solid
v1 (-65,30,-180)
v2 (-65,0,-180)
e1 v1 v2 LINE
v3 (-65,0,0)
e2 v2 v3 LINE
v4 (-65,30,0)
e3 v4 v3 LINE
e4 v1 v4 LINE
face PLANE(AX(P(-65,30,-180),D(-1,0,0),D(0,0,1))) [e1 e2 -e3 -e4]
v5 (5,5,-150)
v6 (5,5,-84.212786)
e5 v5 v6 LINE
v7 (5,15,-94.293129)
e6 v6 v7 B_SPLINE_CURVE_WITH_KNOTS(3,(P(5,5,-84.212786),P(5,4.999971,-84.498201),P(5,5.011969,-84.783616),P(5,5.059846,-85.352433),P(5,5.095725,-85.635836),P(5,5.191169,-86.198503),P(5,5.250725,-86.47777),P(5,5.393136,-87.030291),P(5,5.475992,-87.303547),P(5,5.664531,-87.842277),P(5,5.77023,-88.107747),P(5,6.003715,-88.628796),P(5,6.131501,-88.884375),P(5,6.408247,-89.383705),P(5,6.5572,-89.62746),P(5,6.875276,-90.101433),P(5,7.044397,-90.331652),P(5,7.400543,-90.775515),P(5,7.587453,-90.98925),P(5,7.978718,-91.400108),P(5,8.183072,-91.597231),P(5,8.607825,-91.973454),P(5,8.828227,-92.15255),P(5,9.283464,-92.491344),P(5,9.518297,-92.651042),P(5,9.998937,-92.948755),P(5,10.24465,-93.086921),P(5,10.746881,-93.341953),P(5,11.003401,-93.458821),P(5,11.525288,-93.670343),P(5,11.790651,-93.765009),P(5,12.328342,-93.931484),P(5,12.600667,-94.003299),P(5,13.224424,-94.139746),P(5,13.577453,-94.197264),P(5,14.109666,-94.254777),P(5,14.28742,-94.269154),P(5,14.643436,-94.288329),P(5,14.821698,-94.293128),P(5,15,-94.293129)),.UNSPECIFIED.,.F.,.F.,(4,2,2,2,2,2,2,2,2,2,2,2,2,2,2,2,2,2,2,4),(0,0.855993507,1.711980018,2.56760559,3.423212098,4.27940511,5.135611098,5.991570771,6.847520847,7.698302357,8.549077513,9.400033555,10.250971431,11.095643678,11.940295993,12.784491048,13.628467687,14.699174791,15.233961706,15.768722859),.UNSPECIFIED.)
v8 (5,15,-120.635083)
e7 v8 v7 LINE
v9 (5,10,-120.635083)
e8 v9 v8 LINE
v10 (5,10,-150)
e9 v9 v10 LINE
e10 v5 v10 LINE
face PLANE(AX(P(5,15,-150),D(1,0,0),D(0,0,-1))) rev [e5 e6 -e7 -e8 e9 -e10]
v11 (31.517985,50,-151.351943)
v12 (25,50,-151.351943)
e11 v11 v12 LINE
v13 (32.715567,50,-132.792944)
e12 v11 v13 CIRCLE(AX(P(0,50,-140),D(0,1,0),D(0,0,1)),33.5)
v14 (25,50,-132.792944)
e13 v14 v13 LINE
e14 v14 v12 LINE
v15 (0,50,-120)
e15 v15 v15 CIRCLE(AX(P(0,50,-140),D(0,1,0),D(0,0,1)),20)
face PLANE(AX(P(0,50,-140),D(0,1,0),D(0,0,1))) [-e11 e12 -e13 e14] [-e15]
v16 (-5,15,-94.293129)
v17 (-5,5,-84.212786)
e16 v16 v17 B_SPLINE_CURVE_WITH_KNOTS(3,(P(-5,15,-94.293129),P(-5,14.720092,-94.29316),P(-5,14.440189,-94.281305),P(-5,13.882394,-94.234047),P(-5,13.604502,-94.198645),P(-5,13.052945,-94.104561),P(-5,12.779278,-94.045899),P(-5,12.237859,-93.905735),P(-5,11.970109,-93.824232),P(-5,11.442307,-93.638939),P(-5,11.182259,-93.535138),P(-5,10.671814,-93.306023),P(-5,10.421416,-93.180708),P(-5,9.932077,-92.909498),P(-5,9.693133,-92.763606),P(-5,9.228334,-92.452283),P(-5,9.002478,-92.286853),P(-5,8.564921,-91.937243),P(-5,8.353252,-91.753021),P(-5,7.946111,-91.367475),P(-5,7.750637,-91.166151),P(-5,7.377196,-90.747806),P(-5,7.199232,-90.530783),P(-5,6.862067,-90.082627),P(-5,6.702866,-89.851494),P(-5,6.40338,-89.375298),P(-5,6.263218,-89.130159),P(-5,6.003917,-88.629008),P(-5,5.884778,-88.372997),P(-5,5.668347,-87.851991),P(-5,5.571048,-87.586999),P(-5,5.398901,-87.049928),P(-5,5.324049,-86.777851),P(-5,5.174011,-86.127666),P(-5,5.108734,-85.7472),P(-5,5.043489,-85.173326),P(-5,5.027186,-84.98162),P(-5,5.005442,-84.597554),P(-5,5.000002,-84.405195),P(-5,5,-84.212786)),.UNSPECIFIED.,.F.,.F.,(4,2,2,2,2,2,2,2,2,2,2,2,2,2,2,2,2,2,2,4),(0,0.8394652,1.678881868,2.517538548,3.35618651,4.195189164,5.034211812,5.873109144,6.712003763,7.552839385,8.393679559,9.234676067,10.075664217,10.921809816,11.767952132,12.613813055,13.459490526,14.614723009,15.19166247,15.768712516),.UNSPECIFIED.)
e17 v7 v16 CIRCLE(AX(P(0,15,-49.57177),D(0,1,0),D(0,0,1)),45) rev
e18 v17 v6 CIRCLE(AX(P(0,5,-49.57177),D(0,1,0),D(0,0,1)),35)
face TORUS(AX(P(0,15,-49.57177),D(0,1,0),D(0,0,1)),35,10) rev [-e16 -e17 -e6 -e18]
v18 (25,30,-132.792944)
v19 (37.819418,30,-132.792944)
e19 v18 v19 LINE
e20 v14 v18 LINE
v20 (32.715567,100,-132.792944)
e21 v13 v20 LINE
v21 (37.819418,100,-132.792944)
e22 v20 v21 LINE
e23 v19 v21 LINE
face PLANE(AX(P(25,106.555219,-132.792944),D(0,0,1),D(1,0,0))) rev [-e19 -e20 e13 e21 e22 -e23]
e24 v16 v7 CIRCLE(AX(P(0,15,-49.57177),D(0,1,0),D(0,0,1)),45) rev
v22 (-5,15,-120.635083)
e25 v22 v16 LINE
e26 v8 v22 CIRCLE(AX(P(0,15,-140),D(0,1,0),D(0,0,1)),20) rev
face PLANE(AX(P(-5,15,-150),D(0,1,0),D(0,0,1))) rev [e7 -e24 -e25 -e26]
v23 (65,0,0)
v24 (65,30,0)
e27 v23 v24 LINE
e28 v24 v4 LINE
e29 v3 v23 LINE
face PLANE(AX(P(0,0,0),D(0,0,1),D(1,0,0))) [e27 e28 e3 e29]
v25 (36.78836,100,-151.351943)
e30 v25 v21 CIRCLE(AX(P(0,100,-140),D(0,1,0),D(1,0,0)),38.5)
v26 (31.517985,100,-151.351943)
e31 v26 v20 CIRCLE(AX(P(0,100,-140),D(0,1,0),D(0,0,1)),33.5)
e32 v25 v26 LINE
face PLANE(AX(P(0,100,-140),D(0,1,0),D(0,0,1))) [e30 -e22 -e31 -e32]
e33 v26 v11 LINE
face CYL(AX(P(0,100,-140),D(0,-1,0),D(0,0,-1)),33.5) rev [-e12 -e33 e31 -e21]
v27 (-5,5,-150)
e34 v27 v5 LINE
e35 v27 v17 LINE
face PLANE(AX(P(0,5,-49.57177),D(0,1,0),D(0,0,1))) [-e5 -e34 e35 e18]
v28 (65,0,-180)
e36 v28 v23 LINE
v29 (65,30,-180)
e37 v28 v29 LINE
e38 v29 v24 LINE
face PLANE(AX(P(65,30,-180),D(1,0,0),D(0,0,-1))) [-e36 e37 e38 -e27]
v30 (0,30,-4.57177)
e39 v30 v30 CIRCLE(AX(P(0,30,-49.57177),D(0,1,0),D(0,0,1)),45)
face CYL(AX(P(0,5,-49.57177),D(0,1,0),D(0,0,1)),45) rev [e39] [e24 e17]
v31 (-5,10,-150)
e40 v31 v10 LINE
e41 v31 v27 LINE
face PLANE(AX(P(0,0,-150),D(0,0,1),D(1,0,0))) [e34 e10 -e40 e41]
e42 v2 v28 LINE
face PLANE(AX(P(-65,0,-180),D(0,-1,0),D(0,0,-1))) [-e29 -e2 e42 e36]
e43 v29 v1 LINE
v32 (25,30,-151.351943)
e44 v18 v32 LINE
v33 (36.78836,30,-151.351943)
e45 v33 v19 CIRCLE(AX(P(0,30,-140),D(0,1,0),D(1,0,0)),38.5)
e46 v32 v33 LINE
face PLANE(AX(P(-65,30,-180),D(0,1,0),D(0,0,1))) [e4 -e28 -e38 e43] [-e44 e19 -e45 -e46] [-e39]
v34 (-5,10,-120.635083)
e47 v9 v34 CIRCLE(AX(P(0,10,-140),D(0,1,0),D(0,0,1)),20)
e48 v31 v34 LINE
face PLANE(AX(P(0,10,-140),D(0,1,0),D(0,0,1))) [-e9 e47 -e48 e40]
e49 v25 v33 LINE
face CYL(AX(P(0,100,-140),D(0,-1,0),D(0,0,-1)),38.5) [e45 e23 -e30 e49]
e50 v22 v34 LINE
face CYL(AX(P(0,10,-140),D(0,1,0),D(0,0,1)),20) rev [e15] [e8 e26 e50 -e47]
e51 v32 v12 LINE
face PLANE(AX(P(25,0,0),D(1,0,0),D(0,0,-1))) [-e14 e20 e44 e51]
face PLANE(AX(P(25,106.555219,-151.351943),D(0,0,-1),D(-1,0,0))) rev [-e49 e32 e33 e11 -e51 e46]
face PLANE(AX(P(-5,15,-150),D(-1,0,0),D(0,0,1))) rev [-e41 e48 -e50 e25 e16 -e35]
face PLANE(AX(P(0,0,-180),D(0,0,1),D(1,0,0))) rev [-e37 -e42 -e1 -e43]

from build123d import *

# Parameters (mm, degrees)
SKETCH_1_W          = 130
SKETCH_1_H          = 30
EXTRUDE_1_DEPTH     = 180
SKETCH_2_R          = 38.5
SKETCH_2_R_2        = 33.5
EXTRUDE_1_2_DEPTH   = 70
SKETCH_3_R          = 45
CUT_EXTRUDE_1_DEPTH = 25
SKETCH_5_R          = 33.5
EXTRUDE_2_DEPTH     = 20
SKETCH_4_R          = 20
CUT_EXTRUDE_2_DEPTH = 40
SKETCH_7_W          = 10
SKETCH_7_H          = 10
CUT_EXTRUDE_3_DEPTH = 130
SKETCH_8_W          = 18.558998623
SKETCH_8_H          = 76.555219483
CUT_EXTRUDE_4_DEPTH = 40
FILLET_START        = 5
FILLET_1_2_DEPTH    = 10


with BuildPart() as part:
    # 草图1 → Extrude 1 (new body)
    with BuildSketch(Plane.XY):
        with Locations((0, 15)):
            Rectangle(SKETCH_1_W, SKETCH_1_H)
    extrude(amount=-EXTRUDE_1_DEPTH)

    # 草图2 → Extrude 1 2 (add)
    with BuildSketch(Plane(origin=(0, 30, 0), x_dir=(1, 0, 0), z_dir=(0, 1, 0))):
        with Locations((0, 140)):
            Circle(SKETCH_2_R)
        with Locations((0, 140)):
            Circle(SKETCH_2_R_2, mode=Mode.SUBTRACT)
    extrude(amount=EXTRUDE_1_2_DEPTH)

    # 草图3 → 切除-拉伸1 (cut)
    with BuildSketch(Plane(origin=(0, 30, 0), x_dir=(1, 0, 0), z_dir=(0, 1, 0))):
        with Locations(Location((0, 49.571769675, 0), (0, 0, 270))):
            Circle(SKETCH_3_R)
    extrude(amount=-CUT_EXTRUDE_1_DEPTH, mode=Mode.SUBTRACT)

    # 草图5 → 凸台-拉伸2 (add)
    with BuildSketch(Plane(origin=(0, 30, 0), x_dir=(1, 0, 0), z_dir=(0, 1, 0))):
        with Locations(Location((0, 140, 0), (0, 0, 270))):
            Circle(SKETCH_5_R)
    extrude(amount=EXTRUDE_2_DEPTH)

    # 草图4 → 切除-拉伸2 (cut)
    with BuildSketch(Plane(origin=(0, 50, 0), x_dir=(1, 0, 0), z_dir=(0, 1, 0))):
        with Locations(Location((0, 140, 0), (0, 0, 270))):
            Circle(SKETCH_4_R)
    extrude(amount=-CUT_EXTRUDE_2_DEPTH, mode=Mode.SUBTRACT)

    # 草图7 → 切除-拉伸3 (cut)
    with BuildSketch(Plane.XY.offset(-20)):
        with Locations((0, 10)):
            Rectangle(SKETCH_7_W, SKETCH_7_H)
    extrude(amount=-CUT_EXTRUDE_3_DEPTH, mode=Mode.SUBTRACT)

    # 草图8 → 切除-拉伸4 (cut)
    with BuildSketch(Plane(origin=(65, 0, 0), x_dir=(0, 0, -1), z_dir=(1, 0, 0))):
        with Locations((142.072443273, 68.277609742)):
            Rectangle(SKETCH_8_W, SKETCH_8_H)
    extrude(amount=-CUT_EXTRUDE_4_DEPTH, mode=Mode.SUBTRACT)

    # 圆角1: read off the stored shape, not the designer's step
    # 圆角1 outline → 圆角1 (revolve)
    with BuildSketch(Plane.XY.offset(-49.571769675)):
        with BuildLine():
            ThreePointArc((45, 15), (42.071067812, 7.928932188), (35, 5))
            Line((35, 5), (45, 5))
            Line((45, 5), (45, 15))
        make_face()
    revolve(axis=Axis((0, 0, -49.571769675), (0, 1, 0)))

    # Fillet 1 2 outline → Fillet 1 2 (cut)
    with BuildSketch(Plane(origin=(0, 0, 0), x_dir=(1, 0, 0), z_dir=(0, 1, 0)).offset(FILLET_START)):
        with BuildLine():
            Line((-5, 150), (-5, 84.212785827))
            ThreePointArc((-5, 84.212785827), (0, 14.571769675), (5, 84.212785827))
            Line((5, 84.212785827), (5, 150))
            Line((5, 150), (-5, 150))
        make_face()
    extrude(amount=FILLET_1_2_DEPTH, mode=Mode.SUBTRACT)


solid = part.part
